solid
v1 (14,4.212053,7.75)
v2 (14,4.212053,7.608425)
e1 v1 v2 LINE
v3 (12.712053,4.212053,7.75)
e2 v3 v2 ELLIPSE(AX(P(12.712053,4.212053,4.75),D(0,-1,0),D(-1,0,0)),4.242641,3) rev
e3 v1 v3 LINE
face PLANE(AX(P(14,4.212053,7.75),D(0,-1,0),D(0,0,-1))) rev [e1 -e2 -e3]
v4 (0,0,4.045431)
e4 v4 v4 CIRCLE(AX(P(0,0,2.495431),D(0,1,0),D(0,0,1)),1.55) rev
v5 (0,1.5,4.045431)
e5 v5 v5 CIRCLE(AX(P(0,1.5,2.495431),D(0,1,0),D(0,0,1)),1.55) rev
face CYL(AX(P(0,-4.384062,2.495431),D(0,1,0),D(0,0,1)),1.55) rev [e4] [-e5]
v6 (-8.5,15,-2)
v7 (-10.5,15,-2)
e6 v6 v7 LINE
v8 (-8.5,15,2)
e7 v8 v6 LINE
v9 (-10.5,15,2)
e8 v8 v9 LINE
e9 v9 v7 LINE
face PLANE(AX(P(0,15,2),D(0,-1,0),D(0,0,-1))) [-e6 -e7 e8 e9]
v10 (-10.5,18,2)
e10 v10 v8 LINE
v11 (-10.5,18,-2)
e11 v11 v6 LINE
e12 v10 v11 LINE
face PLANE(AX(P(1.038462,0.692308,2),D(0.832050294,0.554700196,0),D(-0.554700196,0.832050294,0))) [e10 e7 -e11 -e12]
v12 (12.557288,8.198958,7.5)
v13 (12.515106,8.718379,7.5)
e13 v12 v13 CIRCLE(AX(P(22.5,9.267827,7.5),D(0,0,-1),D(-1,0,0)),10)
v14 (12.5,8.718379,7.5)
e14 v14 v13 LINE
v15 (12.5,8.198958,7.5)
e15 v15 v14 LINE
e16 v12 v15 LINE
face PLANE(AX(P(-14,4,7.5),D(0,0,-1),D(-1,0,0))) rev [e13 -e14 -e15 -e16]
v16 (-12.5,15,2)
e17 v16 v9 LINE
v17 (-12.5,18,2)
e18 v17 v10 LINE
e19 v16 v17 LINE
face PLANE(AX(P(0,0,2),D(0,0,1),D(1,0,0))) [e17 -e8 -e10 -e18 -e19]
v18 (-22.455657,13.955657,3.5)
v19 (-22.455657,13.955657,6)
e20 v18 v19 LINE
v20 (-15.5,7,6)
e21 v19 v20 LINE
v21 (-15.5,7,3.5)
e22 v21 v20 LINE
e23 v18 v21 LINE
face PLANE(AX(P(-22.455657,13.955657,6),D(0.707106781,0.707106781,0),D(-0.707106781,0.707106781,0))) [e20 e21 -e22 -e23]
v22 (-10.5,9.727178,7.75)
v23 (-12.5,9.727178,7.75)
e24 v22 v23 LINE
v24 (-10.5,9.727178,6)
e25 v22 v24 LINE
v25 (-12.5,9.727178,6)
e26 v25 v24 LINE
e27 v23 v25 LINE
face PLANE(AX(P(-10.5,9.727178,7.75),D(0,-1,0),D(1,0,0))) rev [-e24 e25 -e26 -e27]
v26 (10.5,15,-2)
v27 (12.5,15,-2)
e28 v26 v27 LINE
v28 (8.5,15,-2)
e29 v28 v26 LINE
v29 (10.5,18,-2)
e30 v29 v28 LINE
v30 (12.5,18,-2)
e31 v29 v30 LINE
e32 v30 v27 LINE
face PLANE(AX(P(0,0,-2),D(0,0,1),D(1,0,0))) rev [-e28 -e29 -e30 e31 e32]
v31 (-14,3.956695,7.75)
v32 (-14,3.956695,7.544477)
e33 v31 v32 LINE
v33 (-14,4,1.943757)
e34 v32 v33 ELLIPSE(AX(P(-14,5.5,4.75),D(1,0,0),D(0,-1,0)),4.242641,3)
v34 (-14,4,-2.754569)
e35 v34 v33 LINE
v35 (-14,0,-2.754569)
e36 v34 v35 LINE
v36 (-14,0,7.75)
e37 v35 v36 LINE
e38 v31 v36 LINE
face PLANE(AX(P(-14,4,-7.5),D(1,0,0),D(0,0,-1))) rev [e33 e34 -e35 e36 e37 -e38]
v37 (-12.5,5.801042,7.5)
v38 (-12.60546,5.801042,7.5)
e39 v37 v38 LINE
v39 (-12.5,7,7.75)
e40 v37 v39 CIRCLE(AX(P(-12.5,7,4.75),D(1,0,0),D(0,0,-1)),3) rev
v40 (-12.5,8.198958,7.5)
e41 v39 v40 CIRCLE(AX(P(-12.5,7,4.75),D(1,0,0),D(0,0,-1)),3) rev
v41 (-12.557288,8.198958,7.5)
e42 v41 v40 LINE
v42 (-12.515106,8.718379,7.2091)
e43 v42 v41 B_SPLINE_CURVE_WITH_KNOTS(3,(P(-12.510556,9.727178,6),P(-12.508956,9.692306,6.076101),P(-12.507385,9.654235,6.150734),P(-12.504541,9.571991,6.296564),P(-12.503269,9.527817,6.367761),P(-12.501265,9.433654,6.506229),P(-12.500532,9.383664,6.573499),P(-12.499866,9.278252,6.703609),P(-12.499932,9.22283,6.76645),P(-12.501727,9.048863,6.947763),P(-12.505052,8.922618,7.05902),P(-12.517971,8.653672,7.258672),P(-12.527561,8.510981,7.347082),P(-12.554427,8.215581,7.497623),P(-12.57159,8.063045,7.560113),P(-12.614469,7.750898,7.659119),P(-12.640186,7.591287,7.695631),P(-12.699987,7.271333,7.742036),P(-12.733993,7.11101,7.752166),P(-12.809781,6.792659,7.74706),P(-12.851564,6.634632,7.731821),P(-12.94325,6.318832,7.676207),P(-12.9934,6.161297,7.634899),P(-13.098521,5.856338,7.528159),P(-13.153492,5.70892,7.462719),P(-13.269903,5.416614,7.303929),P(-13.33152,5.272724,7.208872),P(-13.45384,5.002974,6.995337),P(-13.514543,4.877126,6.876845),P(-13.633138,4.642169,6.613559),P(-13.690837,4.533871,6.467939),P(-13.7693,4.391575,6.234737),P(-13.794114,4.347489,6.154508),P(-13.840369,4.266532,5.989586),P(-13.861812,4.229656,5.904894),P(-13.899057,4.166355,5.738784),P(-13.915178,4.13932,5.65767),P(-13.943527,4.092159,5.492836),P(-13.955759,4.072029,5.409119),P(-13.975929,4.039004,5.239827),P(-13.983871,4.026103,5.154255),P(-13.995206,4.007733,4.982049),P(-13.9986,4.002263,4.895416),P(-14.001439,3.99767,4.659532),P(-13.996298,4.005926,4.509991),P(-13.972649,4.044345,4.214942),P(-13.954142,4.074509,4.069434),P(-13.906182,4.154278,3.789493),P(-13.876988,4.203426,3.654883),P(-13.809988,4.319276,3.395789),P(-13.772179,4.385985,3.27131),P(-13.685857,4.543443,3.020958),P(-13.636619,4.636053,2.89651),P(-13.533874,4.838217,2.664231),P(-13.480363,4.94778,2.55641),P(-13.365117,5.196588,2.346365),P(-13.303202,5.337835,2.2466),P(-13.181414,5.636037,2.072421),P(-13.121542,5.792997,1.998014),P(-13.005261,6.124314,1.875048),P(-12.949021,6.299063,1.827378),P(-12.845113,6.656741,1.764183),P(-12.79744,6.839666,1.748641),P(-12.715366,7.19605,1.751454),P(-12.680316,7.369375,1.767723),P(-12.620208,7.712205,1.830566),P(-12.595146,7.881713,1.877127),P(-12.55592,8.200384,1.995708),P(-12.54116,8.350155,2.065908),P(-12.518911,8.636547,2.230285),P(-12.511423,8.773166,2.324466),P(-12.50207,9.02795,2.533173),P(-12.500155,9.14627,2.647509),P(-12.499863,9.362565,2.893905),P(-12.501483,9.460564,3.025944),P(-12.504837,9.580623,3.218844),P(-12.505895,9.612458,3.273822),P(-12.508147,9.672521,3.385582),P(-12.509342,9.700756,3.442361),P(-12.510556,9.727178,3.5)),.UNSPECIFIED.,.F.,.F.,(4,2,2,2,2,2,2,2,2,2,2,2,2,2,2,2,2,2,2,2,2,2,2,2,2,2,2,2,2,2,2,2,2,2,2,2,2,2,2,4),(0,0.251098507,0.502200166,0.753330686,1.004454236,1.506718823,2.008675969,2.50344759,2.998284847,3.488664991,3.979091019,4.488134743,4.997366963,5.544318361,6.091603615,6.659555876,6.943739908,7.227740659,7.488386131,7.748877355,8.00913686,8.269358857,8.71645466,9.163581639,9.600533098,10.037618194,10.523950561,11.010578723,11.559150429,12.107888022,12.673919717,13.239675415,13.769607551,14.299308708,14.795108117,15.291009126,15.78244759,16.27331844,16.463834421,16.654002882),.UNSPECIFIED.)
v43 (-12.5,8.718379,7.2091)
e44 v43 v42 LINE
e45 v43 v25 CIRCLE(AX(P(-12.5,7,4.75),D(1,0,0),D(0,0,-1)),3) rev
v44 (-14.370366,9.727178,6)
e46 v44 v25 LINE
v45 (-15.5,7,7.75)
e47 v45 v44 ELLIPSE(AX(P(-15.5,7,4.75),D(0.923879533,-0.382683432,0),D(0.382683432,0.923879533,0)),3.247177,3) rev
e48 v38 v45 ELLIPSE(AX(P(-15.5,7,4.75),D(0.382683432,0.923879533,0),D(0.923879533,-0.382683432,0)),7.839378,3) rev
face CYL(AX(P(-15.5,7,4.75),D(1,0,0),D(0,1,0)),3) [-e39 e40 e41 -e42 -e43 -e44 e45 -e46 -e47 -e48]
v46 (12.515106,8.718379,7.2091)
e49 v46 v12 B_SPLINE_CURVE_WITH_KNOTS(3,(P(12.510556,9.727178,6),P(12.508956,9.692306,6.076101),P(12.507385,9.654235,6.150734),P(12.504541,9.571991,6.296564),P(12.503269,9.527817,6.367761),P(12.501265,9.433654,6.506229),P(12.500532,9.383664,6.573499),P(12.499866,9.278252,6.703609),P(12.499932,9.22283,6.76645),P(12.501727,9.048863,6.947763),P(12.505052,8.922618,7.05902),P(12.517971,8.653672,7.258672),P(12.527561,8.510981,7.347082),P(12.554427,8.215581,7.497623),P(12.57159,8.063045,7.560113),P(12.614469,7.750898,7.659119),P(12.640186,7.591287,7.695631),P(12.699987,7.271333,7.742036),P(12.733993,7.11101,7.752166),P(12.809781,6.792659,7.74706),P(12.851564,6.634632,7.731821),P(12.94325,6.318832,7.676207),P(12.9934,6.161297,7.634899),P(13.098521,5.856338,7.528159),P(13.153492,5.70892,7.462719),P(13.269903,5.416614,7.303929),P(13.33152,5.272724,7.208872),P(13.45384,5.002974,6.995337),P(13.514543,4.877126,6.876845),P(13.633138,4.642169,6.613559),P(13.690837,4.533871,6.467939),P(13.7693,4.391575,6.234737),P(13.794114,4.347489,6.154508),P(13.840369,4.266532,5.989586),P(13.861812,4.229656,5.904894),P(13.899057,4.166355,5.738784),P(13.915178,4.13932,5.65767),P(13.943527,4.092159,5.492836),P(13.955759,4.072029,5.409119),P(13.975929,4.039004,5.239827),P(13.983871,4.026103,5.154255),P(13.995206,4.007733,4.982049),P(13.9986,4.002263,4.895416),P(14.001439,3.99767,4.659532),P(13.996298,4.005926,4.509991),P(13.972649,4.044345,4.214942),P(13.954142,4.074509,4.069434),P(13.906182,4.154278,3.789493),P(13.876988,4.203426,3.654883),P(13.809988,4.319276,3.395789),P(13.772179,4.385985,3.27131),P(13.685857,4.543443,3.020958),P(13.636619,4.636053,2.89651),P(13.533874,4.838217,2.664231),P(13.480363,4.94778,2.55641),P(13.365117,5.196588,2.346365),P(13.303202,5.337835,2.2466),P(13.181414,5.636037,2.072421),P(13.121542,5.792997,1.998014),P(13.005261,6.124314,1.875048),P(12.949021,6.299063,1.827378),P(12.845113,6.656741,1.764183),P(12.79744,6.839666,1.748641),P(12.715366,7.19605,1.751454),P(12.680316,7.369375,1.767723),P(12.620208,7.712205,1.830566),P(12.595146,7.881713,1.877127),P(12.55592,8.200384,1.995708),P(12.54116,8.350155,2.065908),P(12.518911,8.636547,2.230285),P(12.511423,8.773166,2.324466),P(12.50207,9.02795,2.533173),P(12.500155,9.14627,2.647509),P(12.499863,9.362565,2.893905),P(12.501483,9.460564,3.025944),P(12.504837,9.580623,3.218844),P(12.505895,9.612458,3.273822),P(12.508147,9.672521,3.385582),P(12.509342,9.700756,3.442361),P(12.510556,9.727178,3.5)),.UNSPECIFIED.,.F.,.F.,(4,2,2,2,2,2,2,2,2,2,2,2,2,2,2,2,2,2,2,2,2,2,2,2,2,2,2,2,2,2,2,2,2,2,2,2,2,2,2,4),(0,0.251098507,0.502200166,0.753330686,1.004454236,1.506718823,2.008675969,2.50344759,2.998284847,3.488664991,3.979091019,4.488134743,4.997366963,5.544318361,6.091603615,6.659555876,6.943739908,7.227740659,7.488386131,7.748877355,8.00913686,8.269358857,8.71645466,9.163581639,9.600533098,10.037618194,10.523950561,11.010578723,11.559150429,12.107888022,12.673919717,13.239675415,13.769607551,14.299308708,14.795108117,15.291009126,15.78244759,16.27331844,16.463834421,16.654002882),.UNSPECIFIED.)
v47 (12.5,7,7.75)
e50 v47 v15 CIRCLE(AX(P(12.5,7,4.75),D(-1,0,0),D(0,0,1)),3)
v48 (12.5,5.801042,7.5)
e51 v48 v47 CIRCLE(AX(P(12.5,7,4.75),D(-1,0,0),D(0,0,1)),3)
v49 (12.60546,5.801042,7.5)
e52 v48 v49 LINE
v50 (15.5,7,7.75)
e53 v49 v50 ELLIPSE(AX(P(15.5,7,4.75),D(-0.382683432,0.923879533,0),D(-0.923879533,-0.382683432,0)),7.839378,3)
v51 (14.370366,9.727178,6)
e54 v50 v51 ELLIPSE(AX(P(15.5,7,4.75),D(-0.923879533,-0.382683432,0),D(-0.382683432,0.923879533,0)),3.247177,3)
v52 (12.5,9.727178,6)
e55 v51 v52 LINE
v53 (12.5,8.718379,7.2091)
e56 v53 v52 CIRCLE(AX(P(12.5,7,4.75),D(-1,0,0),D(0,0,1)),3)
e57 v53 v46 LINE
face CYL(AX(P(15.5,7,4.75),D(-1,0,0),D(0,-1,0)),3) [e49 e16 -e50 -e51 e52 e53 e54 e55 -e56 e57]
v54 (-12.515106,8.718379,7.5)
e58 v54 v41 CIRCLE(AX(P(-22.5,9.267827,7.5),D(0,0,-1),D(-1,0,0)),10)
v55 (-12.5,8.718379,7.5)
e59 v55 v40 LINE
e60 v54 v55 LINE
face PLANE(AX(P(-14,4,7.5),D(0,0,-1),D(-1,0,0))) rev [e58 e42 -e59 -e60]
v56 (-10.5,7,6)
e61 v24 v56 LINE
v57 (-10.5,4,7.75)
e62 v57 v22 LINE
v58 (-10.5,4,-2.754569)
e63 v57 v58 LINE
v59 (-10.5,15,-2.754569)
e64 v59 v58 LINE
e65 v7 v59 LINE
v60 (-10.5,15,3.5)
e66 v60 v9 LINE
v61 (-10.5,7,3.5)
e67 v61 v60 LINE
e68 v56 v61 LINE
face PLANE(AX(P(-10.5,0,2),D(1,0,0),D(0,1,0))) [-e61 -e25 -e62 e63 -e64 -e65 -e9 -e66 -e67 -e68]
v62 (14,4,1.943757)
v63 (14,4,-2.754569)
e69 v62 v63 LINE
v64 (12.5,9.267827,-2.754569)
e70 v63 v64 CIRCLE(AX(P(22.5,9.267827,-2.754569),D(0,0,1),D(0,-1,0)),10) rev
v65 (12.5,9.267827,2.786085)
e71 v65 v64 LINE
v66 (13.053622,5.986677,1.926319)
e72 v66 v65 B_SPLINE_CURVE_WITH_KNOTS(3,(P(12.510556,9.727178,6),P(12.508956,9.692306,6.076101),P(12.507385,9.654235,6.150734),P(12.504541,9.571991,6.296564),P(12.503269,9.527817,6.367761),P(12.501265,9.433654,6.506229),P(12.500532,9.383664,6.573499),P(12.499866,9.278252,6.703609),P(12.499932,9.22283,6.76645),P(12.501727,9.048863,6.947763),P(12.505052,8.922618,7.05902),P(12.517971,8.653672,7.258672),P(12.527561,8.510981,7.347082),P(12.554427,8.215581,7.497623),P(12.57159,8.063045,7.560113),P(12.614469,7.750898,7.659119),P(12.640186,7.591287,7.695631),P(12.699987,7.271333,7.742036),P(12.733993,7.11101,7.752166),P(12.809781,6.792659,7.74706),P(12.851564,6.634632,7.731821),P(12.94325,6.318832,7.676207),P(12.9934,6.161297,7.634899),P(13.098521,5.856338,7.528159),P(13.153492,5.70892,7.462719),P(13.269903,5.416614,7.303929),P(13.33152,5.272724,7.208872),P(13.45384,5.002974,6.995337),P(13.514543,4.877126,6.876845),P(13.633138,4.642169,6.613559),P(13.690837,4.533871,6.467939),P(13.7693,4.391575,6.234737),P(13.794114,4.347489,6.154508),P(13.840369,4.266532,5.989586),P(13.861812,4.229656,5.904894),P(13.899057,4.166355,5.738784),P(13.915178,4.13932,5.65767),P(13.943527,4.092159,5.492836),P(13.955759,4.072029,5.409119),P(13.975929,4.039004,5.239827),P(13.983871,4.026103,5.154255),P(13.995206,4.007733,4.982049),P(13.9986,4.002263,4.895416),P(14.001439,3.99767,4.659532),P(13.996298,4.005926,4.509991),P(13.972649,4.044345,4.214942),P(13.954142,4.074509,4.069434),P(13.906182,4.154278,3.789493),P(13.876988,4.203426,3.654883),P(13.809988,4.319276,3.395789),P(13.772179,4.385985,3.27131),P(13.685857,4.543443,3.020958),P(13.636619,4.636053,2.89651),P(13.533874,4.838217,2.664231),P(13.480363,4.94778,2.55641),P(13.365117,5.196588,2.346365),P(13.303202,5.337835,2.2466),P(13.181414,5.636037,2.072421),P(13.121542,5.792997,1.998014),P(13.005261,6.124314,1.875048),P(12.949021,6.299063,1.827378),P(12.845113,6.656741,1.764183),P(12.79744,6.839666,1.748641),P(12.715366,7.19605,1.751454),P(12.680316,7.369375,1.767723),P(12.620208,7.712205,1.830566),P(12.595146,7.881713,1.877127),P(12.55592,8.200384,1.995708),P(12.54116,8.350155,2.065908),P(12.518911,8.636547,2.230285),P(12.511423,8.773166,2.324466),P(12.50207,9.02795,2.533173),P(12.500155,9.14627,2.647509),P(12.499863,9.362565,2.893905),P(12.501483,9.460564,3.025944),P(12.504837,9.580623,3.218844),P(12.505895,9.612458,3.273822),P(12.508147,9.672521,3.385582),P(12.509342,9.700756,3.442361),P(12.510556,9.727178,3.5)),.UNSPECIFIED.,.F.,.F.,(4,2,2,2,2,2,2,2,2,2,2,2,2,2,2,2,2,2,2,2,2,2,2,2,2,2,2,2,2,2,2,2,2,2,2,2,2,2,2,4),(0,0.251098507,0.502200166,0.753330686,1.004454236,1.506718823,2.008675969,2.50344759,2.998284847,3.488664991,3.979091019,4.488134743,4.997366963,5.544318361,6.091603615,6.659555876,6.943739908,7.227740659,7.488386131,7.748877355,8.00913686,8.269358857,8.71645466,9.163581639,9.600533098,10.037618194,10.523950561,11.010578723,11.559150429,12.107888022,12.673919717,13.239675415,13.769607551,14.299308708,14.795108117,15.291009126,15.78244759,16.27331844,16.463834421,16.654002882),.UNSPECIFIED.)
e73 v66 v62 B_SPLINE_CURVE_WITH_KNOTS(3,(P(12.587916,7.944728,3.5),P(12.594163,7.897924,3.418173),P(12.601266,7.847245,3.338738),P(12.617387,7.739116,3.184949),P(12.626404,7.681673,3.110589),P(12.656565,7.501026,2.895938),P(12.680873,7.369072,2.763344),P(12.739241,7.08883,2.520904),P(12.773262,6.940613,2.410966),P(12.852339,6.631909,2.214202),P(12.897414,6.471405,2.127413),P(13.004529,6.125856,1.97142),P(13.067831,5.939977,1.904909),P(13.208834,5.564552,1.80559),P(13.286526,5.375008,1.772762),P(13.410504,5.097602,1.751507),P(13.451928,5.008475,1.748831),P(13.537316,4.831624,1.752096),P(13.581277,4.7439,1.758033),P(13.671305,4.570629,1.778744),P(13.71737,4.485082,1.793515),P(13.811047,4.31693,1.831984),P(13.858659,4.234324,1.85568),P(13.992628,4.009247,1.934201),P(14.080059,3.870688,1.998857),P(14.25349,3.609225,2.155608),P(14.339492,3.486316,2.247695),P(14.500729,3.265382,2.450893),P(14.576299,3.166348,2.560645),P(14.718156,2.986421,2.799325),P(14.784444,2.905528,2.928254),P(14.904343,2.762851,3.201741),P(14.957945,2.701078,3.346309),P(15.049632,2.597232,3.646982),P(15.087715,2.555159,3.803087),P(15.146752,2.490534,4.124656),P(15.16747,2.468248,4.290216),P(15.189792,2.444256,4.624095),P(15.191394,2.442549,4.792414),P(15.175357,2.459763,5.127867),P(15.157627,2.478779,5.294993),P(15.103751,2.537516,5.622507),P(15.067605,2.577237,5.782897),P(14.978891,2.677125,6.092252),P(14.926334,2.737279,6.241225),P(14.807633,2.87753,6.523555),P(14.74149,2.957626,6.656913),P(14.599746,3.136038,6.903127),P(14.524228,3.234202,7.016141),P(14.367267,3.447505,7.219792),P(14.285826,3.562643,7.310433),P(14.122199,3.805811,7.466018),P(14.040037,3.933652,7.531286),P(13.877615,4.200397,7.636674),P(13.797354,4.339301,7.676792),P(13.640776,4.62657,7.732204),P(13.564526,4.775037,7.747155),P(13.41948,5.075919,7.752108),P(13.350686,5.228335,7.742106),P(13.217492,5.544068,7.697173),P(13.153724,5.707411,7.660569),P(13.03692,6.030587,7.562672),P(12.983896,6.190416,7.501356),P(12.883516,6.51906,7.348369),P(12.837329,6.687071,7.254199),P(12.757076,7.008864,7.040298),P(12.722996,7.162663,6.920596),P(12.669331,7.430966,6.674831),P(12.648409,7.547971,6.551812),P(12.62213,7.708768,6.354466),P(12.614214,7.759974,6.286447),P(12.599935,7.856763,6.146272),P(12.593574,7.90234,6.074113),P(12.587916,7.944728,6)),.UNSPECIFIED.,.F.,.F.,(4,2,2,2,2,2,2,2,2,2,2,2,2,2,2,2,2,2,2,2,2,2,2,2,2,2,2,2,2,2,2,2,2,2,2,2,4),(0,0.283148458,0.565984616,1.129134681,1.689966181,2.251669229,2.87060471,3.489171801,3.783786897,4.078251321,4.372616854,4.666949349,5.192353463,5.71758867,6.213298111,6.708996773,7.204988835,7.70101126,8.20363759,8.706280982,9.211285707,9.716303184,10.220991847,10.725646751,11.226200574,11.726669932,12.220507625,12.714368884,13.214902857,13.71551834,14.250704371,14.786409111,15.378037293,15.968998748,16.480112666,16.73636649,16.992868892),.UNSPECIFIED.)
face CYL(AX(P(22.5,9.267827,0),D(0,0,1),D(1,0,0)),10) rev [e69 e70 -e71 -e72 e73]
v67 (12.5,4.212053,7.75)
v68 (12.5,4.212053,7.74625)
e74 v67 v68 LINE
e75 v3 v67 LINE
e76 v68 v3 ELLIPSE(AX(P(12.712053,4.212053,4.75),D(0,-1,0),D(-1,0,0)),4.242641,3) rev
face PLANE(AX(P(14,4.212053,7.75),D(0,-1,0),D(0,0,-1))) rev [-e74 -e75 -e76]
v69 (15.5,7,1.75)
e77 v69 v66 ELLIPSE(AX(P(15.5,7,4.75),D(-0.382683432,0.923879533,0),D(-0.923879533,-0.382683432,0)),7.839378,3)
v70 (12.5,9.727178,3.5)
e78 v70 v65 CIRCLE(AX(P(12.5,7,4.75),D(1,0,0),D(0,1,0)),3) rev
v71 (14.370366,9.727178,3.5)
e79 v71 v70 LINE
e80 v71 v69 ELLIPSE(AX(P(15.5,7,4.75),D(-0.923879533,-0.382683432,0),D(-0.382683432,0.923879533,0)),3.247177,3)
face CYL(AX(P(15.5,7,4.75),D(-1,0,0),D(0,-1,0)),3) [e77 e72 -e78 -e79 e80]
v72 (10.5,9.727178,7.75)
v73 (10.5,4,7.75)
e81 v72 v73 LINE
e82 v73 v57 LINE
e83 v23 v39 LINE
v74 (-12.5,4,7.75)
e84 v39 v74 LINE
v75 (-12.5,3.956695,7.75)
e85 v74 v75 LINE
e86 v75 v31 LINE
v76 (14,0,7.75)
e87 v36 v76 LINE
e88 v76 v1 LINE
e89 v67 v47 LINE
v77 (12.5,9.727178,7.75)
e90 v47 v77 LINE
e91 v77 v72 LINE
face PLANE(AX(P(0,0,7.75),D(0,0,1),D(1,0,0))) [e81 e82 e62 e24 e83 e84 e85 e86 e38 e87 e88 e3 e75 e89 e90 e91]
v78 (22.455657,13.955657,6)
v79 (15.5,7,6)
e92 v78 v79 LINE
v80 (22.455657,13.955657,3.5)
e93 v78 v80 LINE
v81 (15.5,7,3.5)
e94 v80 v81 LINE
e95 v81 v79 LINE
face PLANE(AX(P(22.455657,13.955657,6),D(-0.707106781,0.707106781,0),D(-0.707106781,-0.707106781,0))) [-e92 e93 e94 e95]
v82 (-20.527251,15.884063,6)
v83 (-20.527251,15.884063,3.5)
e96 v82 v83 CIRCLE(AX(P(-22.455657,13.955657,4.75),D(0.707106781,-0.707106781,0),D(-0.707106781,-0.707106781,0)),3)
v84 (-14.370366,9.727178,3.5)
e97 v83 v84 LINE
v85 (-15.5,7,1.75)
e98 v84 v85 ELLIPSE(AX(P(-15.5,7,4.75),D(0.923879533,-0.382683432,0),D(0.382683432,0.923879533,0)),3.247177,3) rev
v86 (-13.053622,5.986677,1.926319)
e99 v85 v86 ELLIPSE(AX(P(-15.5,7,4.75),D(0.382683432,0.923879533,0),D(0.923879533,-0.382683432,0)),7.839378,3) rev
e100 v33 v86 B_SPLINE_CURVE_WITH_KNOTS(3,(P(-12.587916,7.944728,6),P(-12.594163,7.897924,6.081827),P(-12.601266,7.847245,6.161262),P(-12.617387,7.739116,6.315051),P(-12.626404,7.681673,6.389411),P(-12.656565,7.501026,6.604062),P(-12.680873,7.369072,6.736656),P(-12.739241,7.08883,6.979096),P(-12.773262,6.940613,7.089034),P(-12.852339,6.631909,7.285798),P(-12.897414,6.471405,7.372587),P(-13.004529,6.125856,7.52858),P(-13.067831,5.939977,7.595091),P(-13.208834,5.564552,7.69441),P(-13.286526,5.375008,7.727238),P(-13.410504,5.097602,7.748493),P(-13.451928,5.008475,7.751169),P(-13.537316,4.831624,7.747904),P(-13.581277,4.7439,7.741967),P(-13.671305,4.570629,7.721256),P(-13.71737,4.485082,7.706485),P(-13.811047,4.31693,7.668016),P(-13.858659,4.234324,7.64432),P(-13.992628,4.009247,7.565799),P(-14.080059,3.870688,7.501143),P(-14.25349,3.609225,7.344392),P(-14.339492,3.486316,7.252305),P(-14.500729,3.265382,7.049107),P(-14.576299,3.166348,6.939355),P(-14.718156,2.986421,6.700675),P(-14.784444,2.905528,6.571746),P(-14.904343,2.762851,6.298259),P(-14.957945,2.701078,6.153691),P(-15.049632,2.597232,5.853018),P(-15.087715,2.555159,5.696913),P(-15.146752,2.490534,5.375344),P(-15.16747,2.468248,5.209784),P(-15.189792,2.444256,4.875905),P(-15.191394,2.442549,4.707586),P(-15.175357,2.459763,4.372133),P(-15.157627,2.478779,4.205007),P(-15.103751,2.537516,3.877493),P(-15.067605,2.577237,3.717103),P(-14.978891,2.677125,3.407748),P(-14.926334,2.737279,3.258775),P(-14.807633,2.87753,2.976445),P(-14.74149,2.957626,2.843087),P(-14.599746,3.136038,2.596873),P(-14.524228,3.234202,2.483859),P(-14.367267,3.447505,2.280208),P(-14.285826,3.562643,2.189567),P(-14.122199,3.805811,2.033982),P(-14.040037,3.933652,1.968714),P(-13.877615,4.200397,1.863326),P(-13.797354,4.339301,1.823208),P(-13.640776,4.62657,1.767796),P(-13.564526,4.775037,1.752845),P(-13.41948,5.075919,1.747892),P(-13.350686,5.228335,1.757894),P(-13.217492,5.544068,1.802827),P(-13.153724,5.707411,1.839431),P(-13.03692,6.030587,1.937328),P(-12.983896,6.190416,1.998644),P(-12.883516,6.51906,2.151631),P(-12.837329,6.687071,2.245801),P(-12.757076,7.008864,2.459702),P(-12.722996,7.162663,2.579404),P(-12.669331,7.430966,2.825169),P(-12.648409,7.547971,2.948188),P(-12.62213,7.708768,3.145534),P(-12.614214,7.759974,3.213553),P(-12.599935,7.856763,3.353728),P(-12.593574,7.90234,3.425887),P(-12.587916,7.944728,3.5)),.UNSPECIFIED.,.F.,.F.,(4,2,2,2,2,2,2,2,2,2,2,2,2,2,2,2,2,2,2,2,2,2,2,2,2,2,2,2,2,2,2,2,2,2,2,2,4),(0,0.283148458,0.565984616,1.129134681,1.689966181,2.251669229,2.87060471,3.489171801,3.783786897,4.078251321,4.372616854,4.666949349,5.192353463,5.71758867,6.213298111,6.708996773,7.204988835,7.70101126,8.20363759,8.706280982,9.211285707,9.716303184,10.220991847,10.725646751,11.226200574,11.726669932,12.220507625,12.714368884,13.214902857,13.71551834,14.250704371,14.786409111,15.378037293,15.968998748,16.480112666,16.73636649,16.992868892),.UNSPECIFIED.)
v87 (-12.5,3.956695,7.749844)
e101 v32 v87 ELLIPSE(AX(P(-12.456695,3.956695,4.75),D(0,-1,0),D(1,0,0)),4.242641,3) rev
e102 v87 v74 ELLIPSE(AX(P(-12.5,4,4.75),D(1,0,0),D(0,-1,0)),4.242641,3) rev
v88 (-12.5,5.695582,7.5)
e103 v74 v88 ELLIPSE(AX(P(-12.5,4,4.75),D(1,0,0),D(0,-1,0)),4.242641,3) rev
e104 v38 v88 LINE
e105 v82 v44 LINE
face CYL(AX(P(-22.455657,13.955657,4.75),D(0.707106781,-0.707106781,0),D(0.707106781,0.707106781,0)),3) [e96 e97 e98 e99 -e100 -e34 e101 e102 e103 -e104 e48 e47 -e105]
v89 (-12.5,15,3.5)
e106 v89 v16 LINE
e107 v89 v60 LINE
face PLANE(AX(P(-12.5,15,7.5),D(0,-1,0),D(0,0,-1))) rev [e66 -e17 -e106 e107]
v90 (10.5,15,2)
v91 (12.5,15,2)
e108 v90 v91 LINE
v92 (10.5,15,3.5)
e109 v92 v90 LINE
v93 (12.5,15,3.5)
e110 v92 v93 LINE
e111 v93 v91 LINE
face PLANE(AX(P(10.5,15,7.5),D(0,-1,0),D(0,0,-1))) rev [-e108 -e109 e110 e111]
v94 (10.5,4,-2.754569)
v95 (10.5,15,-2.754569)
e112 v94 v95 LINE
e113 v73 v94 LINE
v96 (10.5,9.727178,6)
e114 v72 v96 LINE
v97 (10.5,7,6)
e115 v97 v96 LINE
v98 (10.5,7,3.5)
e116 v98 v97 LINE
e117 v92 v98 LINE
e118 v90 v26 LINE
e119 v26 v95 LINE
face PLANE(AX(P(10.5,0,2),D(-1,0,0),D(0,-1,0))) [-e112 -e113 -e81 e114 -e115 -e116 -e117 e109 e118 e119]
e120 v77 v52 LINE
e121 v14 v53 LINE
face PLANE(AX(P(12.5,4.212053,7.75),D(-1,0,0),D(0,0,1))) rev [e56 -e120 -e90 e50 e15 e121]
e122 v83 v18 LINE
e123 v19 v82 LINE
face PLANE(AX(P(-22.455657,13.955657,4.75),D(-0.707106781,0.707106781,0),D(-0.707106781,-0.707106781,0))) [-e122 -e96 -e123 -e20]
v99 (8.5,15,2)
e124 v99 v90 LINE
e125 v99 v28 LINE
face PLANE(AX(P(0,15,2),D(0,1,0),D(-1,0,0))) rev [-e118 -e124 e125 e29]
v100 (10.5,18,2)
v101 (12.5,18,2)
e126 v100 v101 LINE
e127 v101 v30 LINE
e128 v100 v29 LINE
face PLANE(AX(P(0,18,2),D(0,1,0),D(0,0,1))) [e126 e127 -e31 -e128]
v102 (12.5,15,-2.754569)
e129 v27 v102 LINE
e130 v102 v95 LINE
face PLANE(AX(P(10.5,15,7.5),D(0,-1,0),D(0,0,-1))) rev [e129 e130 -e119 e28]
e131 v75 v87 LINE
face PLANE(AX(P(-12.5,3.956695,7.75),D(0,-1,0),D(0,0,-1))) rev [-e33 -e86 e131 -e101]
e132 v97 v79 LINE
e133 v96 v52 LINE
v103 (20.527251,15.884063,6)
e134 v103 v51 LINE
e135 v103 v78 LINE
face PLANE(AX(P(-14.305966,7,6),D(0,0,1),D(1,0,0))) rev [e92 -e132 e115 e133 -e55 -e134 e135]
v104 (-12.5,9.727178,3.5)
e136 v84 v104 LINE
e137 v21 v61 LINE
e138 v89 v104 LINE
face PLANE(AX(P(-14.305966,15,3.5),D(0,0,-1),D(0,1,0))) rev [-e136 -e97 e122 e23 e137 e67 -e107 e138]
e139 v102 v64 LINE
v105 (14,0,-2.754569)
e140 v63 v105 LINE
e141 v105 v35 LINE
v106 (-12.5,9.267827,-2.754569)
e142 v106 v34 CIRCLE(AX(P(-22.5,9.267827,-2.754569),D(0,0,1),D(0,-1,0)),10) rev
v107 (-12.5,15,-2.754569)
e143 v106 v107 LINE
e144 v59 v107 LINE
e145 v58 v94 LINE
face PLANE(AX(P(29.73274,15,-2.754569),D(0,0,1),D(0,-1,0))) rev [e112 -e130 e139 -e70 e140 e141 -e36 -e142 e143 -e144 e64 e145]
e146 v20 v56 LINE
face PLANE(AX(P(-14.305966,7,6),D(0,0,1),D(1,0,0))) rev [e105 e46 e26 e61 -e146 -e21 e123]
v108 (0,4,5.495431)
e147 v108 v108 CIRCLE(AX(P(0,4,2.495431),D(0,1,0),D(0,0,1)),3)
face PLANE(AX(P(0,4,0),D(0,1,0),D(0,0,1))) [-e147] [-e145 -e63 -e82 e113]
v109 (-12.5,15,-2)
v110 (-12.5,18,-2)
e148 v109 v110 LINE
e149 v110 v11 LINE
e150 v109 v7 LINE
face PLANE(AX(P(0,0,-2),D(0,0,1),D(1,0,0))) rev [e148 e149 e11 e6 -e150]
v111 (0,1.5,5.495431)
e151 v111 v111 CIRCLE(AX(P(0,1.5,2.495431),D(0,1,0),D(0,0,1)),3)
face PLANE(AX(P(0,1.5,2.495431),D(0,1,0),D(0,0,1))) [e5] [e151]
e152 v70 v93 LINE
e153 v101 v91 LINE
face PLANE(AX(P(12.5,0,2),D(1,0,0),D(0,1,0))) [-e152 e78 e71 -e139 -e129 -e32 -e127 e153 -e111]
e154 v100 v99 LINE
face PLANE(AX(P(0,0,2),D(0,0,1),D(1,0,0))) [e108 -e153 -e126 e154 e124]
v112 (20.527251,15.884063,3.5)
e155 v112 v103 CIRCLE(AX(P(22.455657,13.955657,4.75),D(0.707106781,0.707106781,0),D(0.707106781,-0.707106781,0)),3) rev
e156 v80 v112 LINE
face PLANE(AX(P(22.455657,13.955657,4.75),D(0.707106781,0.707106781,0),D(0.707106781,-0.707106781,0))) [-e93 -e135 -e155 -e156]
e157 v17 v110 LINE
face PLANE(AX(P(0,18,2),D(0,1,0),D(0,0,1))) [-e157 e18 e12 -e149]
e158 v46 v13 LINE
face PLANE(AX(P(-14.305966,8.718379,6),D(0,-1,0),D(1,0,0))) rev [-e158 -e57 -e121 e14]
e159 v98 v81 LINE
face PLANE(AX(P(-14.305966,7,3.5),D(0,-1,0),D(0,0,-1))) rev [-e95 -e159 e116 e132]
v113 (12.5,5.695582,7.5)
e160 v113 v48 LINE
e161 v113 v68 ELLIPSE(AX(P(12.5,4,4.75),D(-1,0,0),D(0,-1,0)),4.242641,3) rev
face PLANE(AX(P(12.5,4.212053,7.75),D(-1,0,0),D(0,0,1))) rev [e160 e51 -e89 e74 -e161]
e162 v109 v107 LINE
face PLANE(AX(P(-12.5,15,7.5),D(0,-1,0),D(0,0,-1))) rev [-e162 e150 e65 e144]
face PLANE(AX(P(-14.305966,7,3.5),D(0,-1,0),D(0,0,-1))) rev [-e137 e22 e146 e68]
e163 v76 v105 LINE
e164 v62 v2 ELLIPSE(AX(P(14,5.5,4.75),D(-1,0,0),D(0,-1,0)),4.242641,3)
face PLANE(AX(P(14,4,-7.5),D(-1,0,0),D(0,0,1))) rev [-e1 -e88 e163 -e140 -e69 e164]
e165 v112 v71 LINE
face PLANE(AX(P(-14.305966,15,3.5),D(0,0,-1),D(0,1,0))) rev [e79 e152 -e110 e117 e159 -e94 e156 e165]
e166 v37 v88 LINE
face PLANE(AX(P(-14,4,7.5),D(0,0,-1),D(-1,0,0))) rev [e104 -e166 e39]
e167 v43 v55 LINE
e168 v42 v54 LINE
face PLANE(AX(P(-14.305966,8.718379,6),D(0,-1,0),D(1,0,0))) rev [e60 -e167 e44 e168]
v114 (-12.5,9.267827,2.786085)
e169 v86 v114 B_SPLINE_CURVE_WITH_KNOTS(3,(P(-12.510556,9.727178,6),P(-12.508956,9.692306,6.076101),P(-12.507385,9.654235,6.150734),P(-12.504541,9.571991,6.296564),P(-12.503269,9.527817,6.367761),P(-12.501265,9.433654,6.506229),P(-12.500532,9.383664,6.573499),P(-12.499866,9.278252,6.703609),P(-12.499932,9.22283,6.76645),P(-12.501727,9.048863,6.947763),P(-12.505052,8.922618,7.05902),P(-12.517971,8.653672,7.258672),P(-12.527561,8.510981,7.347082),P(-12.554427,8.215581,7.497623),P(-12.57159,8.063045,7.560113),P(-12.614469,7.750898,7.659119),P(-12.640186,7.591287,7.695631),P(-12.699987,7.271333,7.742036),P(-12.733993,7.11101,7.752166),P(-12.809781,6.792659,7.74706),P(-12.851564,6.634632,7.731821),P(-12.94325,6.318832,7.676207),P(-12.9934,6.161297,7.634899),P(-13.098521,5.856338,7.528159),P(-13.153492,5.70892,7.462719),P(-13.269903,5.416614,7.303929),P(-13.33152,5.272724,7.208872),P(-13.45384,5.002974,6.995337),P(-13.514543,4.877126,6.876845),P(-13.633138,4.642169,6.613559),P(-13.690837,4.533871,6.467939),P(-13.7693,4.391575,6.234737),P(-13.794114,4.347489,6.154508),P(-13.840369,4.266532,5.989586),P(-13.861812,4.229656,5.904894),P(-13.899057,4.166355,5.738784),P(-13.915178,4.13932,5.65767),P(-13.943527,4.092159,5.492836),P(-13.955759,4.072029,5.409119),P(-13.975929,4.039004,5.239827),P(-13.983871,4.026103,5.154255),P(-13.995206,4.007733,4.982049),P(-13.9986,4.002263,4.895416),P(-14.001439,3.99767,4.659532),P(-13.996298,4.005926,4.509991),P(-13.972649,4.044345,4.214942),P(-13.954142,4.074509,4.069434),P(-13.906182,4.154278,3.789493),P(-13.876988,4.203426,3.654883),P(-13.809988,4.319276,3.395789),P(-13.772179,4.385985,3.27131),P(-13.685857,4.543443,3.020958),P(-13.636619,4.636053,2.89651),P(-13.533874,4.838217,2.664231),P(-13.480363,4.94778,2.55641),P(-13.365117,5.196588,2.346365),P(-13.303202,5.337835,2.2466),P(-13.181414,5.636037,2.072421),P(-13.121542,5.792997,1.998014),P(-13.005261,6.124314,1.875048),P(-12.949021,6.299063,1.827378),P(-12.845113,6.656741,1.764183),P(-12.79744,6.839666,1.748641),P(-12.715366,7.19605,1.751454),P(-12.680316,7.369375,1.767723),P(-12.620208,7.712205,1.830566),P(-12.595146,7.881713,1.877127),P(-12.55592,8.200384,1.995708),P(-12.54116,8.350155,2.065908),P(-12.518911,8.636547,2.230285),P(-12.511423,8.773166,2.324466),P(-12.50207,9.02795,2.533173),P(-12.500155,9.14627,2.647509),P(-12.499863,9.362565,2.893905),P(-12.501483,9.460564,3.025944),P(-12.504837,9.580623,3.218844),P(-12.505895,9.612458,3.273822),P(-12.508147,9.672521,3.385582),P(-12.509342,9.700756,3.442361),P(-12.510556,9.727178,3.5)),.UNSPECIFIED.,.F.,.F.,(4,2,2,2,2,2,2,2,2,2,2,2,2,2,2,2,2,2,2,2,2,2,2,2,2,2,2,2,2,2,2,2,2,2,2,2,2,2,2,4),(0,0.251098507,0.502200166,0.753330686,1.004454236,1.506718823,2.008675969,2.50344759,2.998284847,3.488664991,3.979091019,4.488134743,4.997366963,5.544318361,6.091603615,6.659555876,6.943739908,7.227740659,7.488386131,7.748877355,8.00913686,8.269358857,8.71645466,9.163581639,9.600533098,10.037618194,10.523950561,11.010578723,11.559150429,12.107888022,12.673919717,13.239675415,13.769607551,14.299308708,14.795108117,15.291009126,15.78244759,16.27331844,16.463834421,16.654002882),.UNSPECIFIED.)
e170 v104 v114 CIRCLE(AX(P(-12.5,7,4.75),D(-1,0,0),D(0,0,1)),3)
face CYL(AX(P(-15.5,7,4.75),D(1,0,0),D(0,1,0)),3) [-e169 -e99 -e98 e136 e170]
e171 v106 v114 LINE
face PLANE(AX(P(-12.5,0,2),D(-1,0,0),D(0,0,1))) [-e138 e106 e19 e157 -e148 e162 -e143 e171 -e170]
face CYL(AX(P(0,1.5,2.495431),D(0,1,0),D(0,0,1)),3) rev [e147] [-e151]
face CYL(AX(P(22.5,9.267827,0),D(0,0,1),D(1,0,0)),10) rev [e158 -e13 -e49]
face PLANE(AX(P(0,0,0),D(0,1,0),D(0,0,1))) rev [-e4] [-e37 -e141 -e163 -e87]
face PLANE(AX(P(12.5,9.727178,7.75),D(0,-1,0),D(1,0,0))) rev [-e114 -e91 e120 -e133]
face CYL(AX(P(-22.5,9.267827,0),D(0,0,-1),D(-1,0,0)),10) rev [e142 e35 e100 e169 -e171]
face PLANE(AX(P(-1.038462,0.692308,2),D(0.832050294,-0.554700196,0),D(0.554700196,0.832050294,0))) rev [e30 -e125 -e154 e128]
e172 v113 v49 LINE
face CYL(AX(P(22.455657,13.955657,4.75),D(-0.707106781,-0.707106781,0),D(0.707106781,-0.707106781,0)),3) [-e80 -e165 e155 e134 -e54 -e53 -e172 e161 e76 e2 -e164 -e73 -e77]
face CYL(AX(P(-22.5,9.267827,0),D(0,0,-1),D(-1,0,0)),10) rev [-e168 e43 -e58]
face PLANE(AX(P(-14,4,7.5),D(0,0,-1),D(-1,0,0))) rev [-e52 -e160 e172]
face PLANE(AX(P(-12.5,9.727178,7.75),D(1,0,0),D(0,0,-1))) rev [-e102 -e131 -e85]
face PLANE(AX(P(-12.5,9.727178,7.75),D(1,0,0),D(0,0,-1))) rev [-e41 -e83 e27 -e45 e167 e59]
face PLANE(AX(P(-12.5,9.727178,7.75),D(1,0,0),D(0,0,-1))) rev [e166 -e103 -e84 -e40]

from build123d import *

# Parameters (mm, degrees)
SKETCH1_W                           = 28
SKETCH1_H                           = 15
BOSS_EXTRUDE1_DEPTH                 = 4
SKETCH2_W                           = 2
SKETCH2_H                           = 14
BOSS_EXTRUDE2_DEPTH                 = 2
SKETCH3_W                           = 2
SKETCH3_H                           = 11
BOSS_EXTRUDE3_DEPTH                 = 7.5
FILLET1_R                           = 10
CUT_EXTRUDE5_REACH                  = 33.313
CUT_EXTRUDE5_END_RADIUS             = 10
CUT_EXTRUDE5_DIRECTION_2_REACH      = 33.313
CUT_EXTRUDE5_DIRECTION_2_END_RADIUS = 10
BOSS_EXTRUDE4_DEPTH                 = 5
CUT_EXTRUDE6_DEPTH                  = 2
CUT_EXTRUDE6_DEPTH_BACK             = 15
SKETCH22_W                          = 21
SKETCH22_H                          = 5.222778623
BOSS_EXTRUDE6_START                 = -1.5
BOSS_EXTRUDE6_DEPTH                 = 1.75
CUT_EXTRUDE7_REACH                  = 43.938
SKETCH25_W                          = 4.745430675
SKETCH25_H                          = 15
CUT_EXTRUDE7_DIRECTION_2_REACH      = 43.938
SKETCH26_R                          = 1.55
CUT_EXTRUDE8_DEPTH                  = 4
SKETCH27_R                          = 3
CUT_EXTRUDE9_DEPTH                  = 2.5


with BuildPart() as part:
    # Sketch1 → Boss-Extrude1 (new body)
    with BuildSketch(Plane(origin=(0, 0, 0), x_dir=(1, 0, 0), z_dir=(0, 1, 0))):
        Rectangle(SKETCH1_W, SKETCH1_H)
    extrude(amount=BOSS_EXTRUDE1_DEPTH)

    # Sketch2 → Boss-Extrude2 (add, symmetric)
    with BuildSketch(Plane.XY):
        with Locations((-11.5, 11)):
            Rectangle(SKETCH2_W, SKETCH2_H)
        Polygon((-8.5, 15), (-10.5, 18), (-10.5, 15), align=None)
        Polygon((8.5, 15), (10.5, 15), (10.5, 18), align=None)
        with Locations((11.5, 11)):
            Rectangle(SKETCH2_W, SKETCH2_H)
    extrude(amount=BOSS_EXTRUDE2_DEPTH, both=True)

    # Sketch3 → Boss-Extrude3 (add, symmetric)
    with BuildSketch(Plane.XY):
        with Locations((-11.5, 9.5)):
            Rectangle(SKETCH3_W, SKETCH3_H)
        with Locations((11.5, 9.5)):
            Rectangle(SKETCH3_W, SKETCH3_H)
    extrude(amount=BOSS_EXTRUDE3_DEPTH, both=True)

    # Fillet1
    # the kernel refuses this fillet: 10 mm, written as the material it adds along each edge
    with BuildSketch(Plane(origin=(12.5, 4, -7.5), x_dir=(1, 0, 0), z_dir=(0, 0, 1))) as fillet1_piece_1:
        with BuildLine():
            CenterArc((10, 5.267826876), FILLET1_R, 180, 31.788330617)
            Line((0, 5.267826876), (-0.2, 5.267826876))
            Line((-0.2, 5.267826876), (-0.2, 0))
            Line((-0.2, 0), (0, -0.2))
            ThreePointArc((0, -0.2), (0.75, -0.2), (1.33, -0.105356538))
            Line((1.33, -0.105356538), (1.5, 0))
        make_face()
    extrude(amount=15)
    with BuildSketch(Plane(origin=(-12.5, 4, 7.5), x_dir=(0, 1, 0), z_dir=(0, 0, -1))) as fillet1_piece_2:
        with BuildLine():
            CenterArc((5.267826876, -10), FILLET1_R, 90, 31.788330617)
            Line((0, -1.5), (-0.105356538, -1.33))
            ThreePointArc((-0.105356538, -1.33), (-0.2, -0.75), (-0.2, 0))
            Line((-0.2, 0), (0, 0.2))
            Line((0, 0.2), (5.267826876, 0.2))
            Line((5.267826876, 0.2), (5.267826876, 0))
        make_face()
    extrude(amount=15)

    # Cut-Extrude5: up to this cylinder (the profile starts outside it)
    cut_extrude5_end = Plane(origin=(-22.5, 9.267826876, 5.390493), z_dir=(0, 0, -1)) * Cylinder(CUT_EXTRUDE5_END_RADIUS, 87.626, mode=Mode.PRIVATE)
    # Sketch13 → Cut-Extrude5 (cut, up to the surface)
    with BuildSketch(Plane(origin=(-10.5, 0, 0), x_dir=(0, 0, -1), z_dir=(1, 0, 0)), mode=Mode.PRIVATE) as cut_extrude5_sk1:
        Polygon((-3.5, 15), (-6, 15), (-7.5, 15), (-7.5, 8.718379218), (-6, 8.718379218), (-6, 7), (-3.5, 7), align=None)
    cut_extrude5_tool1 = extrude(cut_extrude5_sk1.sketch, amount=-CUT_EXTRUDE5_REACH, mode=Mode.PRIVATE) - cut_extrude5_end
    add(cut_extrude5_tool1.solids().sort_by_distance((-10.5, 11.275152, 5.390493))[0], mode=Mode.SUBTRACT)

    # Cut-Extrude5 direction 2: up to this cylinder (the profile starts outside it)
    cut_extrude5_direction_2_end = Plane(origin=(22.5, 9.267826876, 5.390493), z_dir=(0, 0, 1)) * Cylinder(CUT_EXTRUDE5_DIRECTION_2_END_RADIUS, 87.626, mode=Mode.PRIVATE)
    # Sketch13 → Cut-Extrude5 direction 2 (cut, up to the surface)
    with BuildSketch(Plane(origin=(-10.5, 0, 0), x_dir=(0, 0, -1), z_dir=(1, 0, 0)), mode=Mode.PRIVATE) as cut_extrude5_direction_2_sk1:
        Polygon((-3.5, 15), (-6, 15), (-7.5, 15), (-7.5, 8.718379218), (-6, 8.718379218), (-6, 7), (-3.5, 7), align=None)
    cut_extrude5_direction_2_tool1 = extrude(cut_extrude5_direction_2_sk1.sketch, amount=CUT_EXTRUDE5_DIRECTION_2_REACH, mode=Mode.PRIVATE) - cut_extrude5_direction_2_end
    add(cut_extrude5_direction_2_tool1.solids().sort_by_distance((-10.5, 11.275152, 5.390493))[0], mode=Mode.SUBTRACT)

    # Sketch14 → Boss-Extrude4 (add)
    with BuildSketch(Plane(origin=(-10.5, 0, 0), x_dir=(0, 0, -1), z_dir=(1, 0, 0))):
        with BuildLine():
            Line((-3.5, 9.727178029), (-3.5, 7))
            Line((-3.5, 7), (-6, 7))
            Line((-6, 7), (-6, 9.727178029))
            ThreePointArc((-6, 9.727178029), (-4.75, 4), (-3.5, 9.727178029))
        make_face()
    boss_extrude4 = extrude(amount=-BOSS_EXTRUDE4_DEPTH)

    # Sweep3: sweep along a path in Sketch17
    with BuildLine(Plane.XY.offset(5)) as sweep3_path:
        Line((-22.411313552, 14), (-11.517237777, 3.105924225))
    # Sketch21 → Sweep3 (sweep)
    with BuildSketch(Plane(origin=(-18.205656776, 18.205656776, 0), x_dir=(-0.7071067811865509, -0.7071067811865441, 0), z_dir=(0.7071067811865441, -0.7071067811865509, 0))):
        with BuildLine():
            Line((6.01040764, -6), (6.01040764, -3.5))
            Line((6.01040764, -3.5), (3.283229611, -3.5))
            ThreePointArc((3.283229611, -3.5), (9.01040764, -4.75), (3.283229611, -6))
            Line((3.283229611, -6), (6.01040764, -6))
        make_face()
    sweep3 = sweep(path=sweep3_path.line)

    # Mirror1: Boss-Extrude4, Sweep3 across plane
    add(boss_extrude4.mirror(Plane(origin=(0, 0, 0), x_dir=(0, 0, 1), z_dir=(1, 0, 0))))
    add(sweep3.mirror(Plane(origin=(0, 0, 0), x_dir=(0, 0, 1), z_dir=(1, 0, 0))))

    # Sketch22 → Cut-Extrude6 (cut, two sides: drawn at the far end of the back side and taken through both)
    with BuildSketch(Plane.XY.offset(7.5).offset(-CUT_EXTRUDE6_DEPTH_BACK)):
        with Locations((0, 6.611389311)):
            Rectangle(SKETCH22_W, SKETCH22_H)
    extrude(amount=CUT_EXTRUDE6_DEPTH + CUT_EXTRUDE6_DEPTH_BACK, mode=Mode.SUBTRACT)

    # Sketch24 → Boss-Extrude6 (add)
    with BuildSketch(Plane.XY.offset(7.5).offset(BOSS_EXTRUDE6_START)):
        Polygon((-10.5, 9.727178029), (-12.5, 9.727178029), (-12.5, 3.956694639), (-14, 3.956694639), (-14, 0), (14, 0), (14, 4.212052915), (12.5, 4.212052915), (12.5, 9.727178029), (10.5, 9.727178029), (10.5, 4), (-10.5, 4), align=None)
    extrude(amount=BOSS_EXTRUDE6_DEPTH)

    # Cut-Extrude7: up to this face of the body (flat: up to its plane)
    cut_extrude7_end = Plane(part.part.faces().sort_by_distance((14, 1.807333916, -0.907267183))[0])
    # Sketch25 → Cut-Extrude7 (cut, up to the picked face)
    with BuildSketch(Plane.ZY.offset(12.5), mode=Mode.PRIVATE) as cut_extrude7_sk1:
        with Locations((-5.127284663, 7.5)):
            Rectangle(SKETCH25_W, SKETCH25_H)
    cut_extrude7_tool1 = split(extrude(cut_extrude7_sk1.sketch, amount=-CUT_EXTRUDE7_REACH, mode=Mode.PRIVATE), bisect_by=cut_extrude7_end, keep=Keep.BOTH, mode=Mode.PRIVATE)
    add(cut_extrude7_tool1.solids().sort_by(Axis((-12.5, 7.5, -5.127285), (1, 0, 0)))[0], mode=Mode.SUBTRACT)

    # Cut-Extrude7 direction 2: up to this face of the body (flat: up to its plane)
    cut_extrude7_direction_2_end = Plane(part.part.faces().sort_by_distance((-14, 1.805327472, -0.914845046))[0])
    # Sketch25 → Cut-Extrude7 direction 2 (cut, up to the picked face)
    with BuildSketch(Plane.ZY.offset(12.5), mode=Mode.PRIVATE) as cut_extrude7_direction_2_sk1:
        with Locations((-5.127284663, 7.5)):
            Rectangle(SKETCH25_W, SKETCH25_H)
    cut_extrude7_direction_2_tool1 = split(extrude(cut_extrude7_direction_2_sk1.sketch, amount=CUT_EXTRUDE7_DIRECTION_2_REACH, mode=Mode.PRIVATE), bisect_by=cut_extrude7_direction_2_end, keep=Keep.BOTH, mode=Mode.PRIVATE)
    add(cut_extrude7_direction_2_tool1.solids().sort_by(Axis((-12.5, 7.5, -5.127285), (-1, 0, 0)))[0], mode=Mode.SUBTRACT)

    # Sketch26 → Cut-Extrude8 (cut)
    with BuildSketch(Plane(origin=(0, 4, 0), x_dir=(1, 0, 0), z_dir=(0, 1, 0))):
        with Locations(Location((0, -2.495430675, 0), (0, 0, 270))):
            Circle(SKETCH26_R)
    extrude(amount=-CUT_EXTRUDE8_DEPTH, mode=Mode.SUBTRACT)

    # Sketch27 → Cut-Extrude9 (cut)
    with BuildSketch(Plane(origin=(0, 4, 0), x_dir=(1, 0, 0), z_dir=(0, 1, 0))):
        with Locations(Location((0, -2.495430675, 0), (0, 0, 270))):
            Circle(SKETCH27_R)
    extrude(amount=-CUT_EXTRUDE9_DEPTH, mode=Mode.SUBTRACT)


solid = part.part
